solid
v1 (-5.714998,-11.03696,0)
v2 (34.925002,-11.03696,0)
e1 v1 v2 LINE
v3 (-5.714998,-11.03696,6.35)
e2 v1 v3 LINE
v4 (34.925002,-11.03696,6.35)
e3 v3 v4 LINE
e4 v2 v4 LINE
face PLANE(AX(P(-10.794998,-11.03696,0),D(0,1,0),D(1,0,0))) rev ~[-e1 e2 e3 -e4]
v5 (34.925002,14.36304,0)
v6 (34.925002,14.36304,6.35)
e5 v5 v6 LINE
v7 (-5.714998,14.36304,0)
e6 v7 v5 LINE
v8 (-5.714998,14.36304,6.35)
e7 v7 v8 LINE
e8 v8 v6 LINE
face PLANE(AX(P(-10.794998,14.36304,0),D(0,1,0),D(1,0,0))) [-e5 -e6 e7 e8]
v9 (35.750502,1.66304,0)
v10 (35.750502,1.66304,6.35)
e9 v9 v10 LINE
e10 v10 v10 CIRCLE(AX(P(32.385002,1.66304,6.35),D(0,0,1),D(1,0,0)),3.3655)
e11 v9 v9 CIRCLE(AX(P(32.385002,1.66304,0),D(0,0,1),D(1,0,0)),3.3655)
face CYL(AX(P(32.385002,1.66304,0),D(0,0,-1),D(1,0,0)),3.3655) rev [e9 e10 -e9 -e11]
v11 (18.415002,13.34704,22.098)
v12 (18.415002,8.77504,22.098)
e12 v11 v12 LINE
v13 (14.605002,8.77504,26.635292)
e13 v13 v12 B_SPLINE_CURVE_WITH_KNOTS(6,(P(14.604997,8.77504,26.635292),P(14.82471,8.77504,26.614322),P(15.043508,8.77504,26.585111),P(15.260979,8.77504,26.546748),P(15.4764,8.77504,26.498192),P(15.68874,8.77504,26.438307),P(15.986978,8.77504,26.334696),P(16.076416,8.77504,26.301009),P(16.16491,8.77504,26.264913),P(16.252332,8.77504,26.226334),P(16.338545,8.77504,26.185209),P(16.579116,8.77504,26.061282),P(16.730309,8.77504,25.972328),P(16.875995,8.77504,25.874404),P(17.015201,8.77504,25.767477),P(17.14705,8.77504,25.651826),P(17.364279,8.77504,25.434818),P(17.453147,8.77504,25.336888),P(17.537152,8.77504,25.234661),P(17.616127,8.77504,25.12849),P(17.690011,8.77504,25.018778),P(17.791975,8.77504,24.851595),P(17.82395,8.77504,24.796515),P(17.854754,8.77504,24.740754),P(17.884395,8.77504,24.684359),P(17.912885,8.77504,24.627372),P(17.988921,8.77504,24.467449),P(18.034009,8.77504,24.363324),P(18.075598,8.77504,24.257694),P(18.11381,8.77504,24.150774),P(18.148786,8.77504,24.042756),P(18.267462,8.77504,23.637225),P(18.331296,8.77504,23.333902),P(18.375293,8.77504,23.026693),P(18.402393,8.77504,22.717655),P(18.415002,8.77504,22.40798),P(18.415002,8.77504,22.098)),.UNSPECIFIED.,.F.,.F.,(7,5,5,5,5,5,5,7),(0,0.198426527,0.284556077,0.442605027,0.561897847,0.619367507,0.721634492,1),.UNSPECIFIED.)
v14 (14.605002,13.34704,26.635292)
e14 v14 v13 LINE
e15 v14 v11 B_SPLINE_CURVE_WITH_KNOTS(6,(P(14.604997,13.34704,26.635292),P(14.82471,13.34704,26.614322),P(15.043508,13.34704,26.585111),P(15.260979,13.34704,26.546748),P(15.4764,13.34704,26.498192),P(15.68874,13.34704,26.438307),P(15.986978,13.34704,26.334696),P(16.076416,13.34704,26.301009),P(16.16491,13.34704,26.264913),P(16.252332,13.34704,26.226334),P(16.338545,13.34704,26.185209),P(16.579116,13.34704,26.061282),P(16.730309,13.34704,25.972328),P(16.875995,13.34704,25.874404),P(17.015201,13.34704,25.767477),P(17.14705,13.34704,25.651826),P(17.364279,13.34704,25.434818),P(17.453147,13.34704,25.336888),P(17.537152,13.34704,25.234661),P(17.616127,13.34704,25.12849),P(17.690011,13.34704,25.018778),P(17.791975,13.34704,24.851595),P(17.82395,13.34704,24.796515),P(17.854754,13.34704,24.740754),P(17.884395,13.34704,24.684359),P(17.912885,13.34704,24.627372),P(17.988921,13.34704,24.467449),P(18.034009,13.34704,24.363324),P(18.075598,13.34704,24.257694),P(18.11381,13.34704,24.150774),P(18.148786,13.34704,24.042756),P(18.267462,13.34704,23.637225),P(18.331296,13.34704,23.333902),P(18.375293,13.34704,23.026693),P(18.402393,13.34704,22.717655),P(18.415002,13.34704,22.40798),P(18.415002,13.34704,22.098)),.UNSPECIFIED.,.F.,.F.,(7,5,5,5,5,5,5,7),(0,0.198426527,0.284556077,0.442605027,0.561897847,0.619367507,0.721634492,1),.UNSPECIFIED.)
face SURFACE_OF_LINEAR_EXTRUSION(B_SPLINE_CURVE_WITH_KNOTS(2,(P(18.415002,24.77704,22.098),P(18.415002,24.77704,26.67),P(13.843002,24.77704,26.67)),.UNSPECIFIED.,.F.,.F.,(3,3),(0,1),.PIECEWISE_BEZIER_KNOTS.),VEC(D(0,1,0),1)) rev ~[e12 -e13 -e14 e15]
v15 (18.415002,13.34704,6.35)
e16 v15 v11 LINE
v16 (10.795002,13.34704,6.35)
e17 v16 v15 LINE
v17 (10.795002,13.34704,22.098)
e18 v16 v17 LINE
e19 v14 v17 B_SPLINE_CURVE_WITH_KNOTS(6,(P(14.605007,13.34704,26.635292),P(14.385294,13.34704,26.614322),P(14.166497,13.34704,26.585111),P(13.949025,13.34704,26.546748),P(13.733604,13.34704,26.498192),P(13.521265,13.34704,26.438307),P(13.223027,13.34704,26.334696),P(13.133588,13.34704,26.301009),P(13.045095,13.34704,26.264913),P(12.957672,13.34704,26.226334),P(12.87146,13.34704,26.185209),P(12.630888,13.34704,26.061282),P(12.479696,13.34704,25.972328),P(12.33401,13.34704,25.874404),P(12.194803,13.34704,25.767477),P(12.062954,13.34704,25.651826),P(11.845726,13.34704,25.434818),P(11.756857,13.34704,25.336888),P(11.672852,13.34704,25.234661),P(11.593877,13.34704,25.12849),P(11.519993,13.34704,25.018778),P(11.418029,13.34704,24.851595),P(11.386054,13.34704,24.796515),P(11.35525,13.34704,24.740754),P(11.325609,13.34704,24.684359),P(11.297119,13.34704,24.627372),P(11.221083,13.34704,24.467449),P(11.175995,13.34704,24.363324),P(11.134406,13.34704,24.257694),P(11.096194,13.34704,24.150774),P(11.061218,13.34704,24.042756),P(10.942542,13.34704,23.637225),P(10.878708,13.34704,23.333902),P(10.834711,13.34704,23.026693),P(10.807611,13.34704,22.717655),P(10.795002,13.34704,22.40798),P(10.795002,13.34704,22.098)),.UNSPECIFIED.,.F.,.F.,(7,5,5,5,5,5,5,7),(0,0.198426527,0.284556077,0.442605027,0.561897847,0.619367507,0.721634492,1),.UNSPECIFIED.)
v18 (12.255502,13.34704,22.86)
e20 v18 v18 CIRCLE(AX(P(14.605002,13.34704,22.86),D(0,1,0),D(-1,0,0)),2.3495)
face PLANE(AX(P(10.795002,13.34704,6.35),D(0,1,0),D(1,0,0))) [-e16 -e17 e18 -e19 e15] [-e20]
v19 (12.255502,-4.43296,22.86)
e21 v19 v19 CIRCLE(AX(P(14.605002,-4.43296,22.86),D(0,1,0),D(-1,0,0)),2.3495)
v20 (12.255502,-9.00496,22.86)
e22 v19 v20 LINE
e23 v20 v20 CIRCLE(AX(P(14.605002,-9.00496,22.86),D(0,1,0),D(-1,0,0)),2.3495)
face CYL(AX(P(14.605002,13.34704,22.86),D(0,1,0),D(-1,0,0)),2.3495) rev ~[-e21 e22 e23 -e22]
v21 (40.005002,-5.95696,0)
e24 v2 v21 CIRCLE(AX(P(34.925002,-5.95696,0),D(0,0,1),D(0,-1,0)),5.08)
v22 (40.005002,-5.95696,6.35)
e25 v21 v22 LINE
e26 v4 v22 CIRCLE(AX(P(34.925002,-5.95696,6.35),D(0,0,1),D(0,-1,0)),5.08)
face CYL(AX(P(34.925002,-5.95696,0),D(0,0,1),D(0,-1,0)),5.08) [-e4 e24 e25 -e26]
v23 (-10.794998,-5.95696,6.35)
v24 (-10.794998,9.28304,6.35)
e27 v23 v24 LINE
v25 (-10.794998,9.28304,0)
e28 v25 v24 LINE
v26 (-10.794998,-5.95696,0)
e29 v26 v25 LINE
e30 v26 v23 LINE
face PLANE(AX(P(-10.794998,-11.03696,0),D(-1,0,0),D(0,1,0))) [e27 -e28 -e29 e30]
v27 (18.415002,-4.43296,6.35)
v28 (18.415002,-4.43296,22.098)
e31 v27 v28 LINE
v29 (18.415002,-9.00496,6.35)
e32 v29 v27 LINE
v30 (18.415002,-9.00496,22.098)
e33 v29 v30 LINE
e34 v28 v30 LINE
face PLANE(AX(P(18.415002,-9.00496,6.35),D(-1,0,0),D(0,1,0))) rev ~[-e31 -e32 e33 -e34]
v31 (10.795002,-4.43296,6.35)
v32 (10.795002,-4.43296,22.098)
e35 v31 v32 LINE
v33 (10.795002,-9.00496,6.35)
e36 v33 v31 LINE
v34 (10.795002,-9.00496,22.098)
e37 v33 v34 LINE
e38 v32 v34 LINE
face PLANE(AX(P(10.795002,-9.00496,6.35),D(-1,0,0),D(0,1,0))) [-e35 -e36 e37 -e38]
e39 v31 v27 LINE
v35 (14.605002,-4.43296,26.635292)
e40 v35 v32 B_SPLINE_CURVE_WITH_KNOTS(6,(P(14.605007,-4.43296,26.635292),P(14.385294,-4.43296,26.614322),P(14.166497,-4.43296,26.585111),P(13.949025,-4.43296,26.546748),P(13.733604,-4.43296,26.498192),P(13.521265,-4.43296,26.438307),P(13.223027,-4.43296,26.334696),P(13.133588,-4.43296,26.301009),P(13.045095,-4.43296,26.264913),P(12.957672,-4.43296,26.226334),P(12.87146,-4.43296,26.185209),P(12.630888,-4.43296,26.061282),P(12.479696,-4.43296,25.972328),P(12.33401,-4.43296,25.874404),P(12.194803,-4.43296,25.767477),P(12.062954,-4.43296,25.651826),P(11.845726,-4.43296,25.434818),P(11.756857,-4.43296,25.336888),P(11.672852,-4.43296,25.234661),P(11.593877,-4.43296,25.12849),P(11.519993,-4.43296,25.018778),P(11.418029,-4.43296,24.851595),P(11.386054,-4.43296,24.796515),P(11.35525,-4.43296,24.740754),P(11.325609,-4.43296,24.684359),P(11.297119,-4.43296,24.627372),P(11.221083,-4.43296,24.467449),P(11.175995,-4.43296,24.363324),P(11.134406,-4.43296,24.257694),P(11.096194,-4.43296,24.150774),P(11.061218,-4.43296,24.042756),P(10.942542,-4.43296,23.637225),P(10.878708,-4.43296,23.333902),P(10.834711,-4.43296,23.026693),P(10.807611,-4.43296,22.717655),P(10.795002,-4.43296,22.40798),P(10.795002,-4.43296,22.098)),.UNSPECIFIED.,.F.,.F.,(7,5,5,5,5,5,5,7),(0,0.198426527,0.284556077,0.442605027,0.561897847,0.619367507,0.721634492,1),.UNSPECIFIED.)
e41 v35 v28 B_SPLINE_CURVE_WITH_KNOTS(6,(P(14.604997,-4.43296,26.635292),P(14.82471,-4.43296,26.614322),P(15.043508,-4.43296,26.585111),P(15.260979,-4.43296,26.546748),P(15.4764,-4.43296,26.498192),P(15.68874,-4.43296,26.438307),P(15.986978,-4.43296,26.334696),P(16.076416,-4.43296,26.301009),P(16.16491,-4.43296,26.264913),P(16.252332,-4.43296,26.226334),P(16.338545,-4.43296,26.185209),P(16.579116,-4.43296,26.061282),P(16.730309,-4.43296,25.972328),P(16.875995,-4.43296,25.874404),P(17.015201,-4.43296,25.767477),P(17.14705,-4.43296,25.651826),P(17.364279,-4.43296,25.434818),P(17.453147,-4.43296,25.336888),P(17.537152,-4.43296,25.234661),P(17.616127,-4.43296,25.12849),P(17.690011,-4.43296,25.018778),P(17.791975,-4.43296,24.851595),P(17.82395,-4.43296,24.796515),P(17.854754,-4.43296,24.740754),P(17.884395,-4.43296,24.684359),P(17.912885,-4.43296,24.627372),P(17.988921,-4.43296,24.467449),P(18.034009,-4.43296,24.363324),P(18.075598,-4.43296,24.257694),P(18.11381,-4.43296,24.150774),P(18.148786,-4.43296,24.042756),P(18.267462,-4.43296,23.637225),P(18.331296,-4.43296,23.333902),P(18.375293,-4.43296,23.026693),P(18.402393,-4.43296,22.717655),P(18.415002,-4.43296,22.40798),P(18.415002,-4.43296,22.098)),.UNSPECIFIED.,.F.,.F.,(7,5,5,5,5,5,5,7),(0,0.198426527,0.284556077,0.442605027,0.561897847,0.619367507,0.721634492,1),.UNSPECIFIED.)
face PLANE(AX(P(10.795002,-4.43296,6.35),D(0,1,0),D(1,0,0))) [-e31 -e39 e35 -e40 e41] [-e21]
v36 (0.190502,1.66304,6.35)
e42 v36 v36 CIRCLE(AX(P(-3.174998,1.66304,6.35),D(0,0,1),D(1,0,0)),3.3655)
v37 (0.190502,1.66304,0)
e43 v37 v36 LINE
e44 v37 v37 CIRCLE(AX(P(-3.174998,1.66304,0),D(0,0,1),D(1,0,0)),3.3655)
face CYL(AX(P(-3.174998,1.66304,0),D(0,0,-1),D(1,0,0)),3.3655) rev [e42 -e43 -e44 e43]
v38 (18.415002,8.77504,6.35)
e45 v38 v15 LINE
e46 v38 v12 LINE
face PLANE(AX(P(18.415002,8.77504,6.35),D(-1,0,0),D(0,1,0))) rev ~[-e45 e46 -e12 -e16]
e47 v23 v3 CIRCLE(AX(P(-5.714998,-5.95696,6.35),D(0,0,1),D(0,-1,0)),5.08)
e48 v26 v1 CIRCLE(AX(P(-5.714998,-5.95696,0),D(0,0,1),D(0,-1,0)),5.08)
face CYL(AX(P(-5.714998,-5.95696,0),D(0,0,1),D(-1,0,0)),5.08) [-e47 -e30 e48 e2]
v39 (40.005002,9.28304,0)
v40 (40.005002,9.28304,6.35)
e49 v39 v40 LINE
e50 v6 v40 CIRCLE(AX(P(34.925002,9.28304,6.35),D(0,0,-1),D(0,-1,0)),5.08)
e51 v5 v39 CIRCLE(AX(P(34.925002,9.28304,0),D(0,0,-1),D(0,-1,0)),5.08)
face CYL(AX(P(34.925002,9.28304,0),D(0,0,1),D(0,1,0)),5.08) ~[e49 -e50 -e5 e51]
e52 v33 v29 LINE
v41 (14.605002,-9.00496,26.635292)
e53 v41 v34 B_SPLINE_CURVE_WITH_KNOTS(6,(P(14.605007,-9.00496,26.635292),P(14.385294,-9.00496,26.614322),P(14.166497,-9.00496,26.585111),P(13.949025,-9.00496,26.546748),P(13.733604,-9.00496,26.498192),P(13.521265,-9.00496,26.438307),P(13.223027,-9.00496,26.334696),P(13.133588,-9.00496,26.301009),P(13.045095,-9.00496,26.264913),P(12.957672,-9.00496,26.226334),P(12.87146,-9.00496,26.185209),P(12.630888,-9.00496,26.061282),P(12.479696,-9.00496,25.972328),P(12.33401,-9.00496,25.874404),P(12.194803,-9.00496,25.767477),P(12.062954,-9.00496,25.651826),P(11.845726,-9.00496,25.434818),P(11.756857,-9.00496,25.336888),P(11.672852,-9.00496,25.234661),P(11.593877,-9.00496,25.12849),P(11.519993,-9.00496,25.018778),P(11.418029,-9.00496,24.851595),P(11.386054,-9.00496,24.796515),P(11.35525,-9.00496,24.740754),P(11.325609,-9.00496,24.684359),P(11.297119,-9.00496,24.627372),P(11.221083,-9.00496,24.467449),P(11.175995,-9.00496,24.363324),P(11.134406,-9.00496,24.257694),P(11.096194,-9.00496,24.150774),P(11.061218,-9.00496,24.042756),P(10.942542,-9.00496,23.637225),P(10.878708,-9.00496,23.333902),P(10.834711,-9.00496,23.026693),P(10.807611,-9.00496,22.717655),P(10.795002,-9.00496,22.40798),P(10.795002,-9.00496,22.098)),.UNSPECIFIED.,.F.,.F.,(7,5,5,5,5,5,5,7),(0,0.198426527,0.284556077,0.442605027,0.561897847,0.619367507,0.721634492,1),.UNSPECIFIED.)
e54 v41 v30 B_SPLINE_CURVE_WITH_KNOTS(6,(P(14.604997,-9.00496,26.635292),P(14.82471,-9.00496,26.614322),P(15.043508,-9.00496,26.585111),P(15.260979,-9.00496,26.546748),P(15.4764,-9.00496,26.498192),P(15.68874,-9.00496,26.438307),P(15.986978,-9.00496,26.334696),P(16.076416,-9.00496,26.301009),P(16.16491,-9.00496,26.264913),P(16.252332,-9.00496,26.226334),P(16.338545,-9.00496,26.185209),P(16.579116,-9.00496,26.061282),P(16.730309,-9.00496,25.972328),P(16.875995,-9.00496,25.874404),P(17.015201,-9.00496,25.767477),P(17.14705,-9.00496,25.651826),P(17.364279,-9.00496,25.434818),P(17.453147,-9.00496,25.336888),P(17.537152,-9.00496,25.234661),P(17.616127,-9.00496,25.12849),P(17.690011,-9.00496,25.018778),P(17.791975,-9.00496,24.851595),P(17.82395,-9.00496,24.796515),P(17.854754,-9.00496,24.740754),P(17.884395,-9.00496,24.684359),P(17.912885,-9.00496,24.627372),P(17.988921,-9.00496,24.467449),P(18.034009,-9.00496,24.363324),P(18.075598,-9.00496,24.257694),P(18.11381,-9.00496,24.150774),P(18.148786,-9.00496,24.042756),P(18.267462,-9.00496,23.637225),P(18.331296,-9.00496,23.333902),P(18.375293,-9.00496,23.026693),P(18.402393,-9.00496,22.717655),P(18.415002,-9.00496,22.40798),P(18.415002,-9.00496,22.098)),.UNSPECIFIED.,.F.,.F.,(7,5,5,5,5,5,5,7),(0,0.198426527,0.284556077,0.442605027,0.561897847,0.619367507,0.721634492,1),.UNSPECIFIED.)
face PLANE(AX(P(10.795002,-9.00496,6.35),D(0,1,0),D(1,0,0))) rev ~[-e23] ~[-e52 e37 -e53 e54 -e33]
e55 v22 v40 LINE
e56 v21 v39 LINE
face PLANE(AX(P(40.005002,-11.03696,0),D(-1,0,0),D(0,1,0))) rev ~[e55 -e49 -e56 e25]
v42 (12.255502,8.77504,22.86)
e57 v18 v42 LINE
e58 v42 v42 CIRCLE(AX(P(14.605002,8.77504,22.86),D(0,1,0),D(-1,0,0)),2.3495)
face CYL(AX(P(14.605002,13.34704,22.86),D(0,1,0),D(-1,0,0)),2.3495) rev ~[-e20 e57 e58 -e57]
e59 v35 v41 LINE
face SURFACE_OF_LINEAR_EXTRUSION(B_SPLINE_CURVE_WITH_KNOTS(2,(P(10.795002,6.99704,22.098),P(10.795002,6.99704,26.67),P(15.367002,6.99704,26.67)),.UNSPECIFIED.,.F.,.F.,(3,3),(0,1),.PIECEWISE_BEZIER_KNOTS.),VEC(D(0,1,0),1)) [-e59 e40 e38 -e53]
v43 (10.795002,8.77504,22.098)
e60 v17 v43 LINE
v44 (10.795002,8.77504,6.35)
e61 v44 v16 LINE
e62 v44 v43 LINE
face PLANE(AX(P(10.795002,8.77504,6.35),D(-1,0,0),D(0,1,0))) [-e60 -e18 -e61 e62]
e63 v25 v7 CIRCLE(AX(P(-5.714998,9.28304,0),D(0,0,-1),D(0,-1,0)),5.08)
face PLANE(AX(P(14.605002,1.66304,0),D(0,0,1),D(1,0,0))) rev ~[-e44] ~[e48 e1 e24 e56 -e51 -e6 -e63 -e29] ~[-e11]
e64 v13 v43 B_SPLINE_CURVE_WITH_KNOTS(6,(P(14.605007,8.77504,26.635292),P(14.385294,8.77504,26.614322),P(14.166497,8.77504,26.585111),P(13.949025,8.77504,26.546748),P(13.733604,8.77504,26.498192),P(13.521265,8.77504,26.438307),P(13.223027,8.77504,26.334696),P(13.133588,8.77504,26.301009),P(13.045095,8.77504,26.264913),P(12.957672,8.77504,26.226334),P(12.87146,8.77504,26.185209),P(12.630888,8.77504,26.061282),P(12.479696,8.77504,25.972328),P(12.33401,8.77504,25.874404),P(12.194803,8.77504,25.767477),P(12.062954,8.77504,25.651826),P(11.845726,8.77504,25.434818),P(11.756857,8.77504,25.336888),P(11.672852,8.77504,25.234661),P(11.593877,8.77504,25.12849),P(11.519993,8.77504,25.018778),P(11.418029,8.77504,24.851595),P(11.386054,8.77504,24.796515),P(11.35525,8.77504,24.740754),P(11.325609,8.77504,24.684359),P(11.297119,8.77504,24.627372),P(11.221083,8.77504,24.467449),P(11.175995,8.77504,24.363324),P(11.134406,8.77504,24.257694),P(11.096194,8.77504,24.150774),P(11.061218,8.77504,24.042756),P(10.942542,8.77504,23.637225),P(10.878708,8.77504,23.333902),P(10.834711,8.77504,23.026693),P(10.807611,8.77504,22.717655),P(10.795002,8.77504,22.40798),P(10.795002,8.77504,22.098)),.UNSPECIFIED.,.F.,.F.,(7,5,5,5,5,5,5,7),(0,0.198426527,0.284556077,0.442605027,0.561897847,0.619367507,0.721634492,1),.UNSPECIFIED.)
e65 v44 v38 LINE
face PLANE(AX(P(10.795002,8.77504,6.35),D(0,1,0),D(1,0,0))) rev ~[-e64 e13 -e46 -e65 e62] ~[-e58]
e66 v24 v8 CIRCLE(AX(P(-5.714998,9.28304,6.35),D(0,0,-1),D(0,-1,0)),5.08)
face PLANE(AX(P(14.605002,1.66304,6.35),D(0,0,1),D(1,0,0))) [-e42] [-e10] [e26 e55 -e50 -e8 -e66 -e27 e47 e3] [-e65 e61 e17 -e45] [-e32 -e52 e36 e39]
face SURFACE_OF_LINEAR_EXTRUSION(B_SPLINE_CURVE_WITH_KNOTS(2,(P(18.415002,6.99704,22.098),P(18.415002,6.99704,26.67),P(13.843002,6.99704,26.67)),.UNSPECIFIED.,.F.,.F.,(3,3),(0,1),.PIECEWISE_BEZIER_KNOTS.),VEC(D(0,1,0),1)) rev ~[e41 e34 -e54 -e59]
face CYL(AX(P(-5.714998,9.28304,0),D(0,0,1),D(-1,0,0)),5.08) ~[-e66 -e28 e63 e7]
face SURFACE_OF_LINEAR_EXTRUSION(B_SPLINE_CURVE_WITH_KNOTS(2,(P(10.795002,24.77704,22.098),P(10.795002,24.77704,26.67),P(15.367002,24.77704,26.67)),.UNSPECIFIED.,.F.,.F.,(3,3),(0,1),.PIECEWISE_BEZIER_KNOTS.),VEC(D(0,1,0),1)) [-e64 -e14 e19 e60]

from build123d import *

# Parameters (mm, degrees)
F0_W        = 50.8
F0_H        = 25.4
F0_R        = 3.3655
F1_DEPTH    = 6.35
F2_R        = 5.08
F3_W        = 7.62
F3_H        = 4.572
F4_DEPTH    = 20.32
F5_R        = 2.3495
F6_DEPTH    = 25.4
F7_T1_DEPTH = 27.432
F7_T3_DEPTH = 27.432


# Not quite as in the source:
# - a fillet or chamfer that OpenCascade refuses, or shapes differently, is made with other operations: its cross-section is extruded or revolved along the edge and cut away or added


with BuildPart() as f1:
    # F0 (on Top) → F1 (new body)
    with BuildSketch(Plane.XY):
        with Locations((14.6050021708, 1.6630402533)):
            Rectangle(F0_W, F0_H)
        with Locations((-3.1749978292, 1.6630402533)):
            Circle(F0_R, mode=Mode.SUBTRACT)
        with Locations((32.3850021708, 1.6630402533)):
            Circle(F0_R, mode=Mode.SUBTRACT)
    extrude(amount=F1_DEPTH)

    # F2
    f2_edges = [f1.edges().sort_by_distance(p)[0] for p in [
        (40.005002, -11.03696, 3.175),
        (40.005002, 14.36304, 3.175),
        (-10.794998, -11.03696, 3.175),
        (-10.794998, 14.36304, 3.175),
    ]]
    fillet(f2_edges, radius=F2_R)

    # F3 (on face) → F4 (join)
    with BuildSketch(Plane.XY.offset(6.35)):
        with Locations((14.6050021708, 11.0610402533)):
            Rectangle(F3_W, F3_H)
        with Locations((14.6050021708, -6.7189597467)):
            Rectangle(F3_W, F3_H)
    extrude(amount=F4_DEPTH)

    # F5 (on face) → F6 (cut)
    with BuildSketch(Plane(origin=(0, 13.3470402533, 0), x_dir=(-1, 0, 0), z_dir=(0, 1, 0))):
        with Locations((-14.6050021708, 22.86)):
            Circle(F5_R)
    extrude(amount=-F6_DEPTH, mode=Mode.SUBTRACT)

    # F7: fillet of radius 4.572 on 4 edges, made by hand

    # F7_s2 → F7_t1 (cut)
    with BuildSketch(Plane.XZ.offset(-6.9970402533)):
        with BuildLine():
            add(Edge.make_bspline(
                [(18.4150021708, 22.098), (18.4150021708, 26.67), (13.8430021708, 26.67)],
                knots=[0, 0, 0, 1, 1, 1], degree=2, weights=[1, 1, 1]))
            Line((13.8430021708, 26.67), (18.4150021708, 26.67))
            Line((18.4150021708, 26.67), (18.4150021708, 22.098))
        make_face()
        with BuildLine():
            add(Edge.make_bspline(
                [(10.7950021708, 22.098), (10.7950021708, 26.67), (15.3670021708, 26.67)],
                knots=[0, 0, 0, 1, 1, 1], degree=2, weights=[1, 1, 1]))
            Line((15.3670021708, 26.67), (10.7950021708, 26.67))
            Line((10.7950021708, 26.67), (10.7950021708, 22.098))
        make_face()
    extrude(amount=F7_T1_DEPTH, mode=Mode.SUBTRACT)

    # F7_s4 → F7_t3 (cut)
    with BuildSketch(Plane.XZ.offset(-24.7770402533)):
        with BuildLine():
            add(Edge.make_bspline(
                [(18.4150021708, 22.098), (18.4150021708, 26.67), (13.8430021708, 26.67)],
                knots=[0, 0, 0, 1, 1, 1], degree=2, weights=[1, 1, 1]))
            Line((13.8430021708, 26.67), (18.4150021708, 26.67))
            Line((18.4150021708, 26.67), (18.4150021708, 22.098))
        make_face()
        with BuildLine():
            add(Edge.make_bspline(
                [(10.7950021708, 22.098), (10.7950021708, 26.67), (15.3670021708, 26.67)],
                knots=[0, 0, 0, 1, 1, 1], degree=2, weights=[1, 1, 1]))
            Line((15.3670021708, 26.67), (10.7950021708, 26.67))
            Line((10.7950021708, 26.67), (10.7950021708, 22.098))
        make_face()
    extrude(amount=F7_T3_DEPTH, mode=Mode.SUBTRACT)


solid = f1.part
